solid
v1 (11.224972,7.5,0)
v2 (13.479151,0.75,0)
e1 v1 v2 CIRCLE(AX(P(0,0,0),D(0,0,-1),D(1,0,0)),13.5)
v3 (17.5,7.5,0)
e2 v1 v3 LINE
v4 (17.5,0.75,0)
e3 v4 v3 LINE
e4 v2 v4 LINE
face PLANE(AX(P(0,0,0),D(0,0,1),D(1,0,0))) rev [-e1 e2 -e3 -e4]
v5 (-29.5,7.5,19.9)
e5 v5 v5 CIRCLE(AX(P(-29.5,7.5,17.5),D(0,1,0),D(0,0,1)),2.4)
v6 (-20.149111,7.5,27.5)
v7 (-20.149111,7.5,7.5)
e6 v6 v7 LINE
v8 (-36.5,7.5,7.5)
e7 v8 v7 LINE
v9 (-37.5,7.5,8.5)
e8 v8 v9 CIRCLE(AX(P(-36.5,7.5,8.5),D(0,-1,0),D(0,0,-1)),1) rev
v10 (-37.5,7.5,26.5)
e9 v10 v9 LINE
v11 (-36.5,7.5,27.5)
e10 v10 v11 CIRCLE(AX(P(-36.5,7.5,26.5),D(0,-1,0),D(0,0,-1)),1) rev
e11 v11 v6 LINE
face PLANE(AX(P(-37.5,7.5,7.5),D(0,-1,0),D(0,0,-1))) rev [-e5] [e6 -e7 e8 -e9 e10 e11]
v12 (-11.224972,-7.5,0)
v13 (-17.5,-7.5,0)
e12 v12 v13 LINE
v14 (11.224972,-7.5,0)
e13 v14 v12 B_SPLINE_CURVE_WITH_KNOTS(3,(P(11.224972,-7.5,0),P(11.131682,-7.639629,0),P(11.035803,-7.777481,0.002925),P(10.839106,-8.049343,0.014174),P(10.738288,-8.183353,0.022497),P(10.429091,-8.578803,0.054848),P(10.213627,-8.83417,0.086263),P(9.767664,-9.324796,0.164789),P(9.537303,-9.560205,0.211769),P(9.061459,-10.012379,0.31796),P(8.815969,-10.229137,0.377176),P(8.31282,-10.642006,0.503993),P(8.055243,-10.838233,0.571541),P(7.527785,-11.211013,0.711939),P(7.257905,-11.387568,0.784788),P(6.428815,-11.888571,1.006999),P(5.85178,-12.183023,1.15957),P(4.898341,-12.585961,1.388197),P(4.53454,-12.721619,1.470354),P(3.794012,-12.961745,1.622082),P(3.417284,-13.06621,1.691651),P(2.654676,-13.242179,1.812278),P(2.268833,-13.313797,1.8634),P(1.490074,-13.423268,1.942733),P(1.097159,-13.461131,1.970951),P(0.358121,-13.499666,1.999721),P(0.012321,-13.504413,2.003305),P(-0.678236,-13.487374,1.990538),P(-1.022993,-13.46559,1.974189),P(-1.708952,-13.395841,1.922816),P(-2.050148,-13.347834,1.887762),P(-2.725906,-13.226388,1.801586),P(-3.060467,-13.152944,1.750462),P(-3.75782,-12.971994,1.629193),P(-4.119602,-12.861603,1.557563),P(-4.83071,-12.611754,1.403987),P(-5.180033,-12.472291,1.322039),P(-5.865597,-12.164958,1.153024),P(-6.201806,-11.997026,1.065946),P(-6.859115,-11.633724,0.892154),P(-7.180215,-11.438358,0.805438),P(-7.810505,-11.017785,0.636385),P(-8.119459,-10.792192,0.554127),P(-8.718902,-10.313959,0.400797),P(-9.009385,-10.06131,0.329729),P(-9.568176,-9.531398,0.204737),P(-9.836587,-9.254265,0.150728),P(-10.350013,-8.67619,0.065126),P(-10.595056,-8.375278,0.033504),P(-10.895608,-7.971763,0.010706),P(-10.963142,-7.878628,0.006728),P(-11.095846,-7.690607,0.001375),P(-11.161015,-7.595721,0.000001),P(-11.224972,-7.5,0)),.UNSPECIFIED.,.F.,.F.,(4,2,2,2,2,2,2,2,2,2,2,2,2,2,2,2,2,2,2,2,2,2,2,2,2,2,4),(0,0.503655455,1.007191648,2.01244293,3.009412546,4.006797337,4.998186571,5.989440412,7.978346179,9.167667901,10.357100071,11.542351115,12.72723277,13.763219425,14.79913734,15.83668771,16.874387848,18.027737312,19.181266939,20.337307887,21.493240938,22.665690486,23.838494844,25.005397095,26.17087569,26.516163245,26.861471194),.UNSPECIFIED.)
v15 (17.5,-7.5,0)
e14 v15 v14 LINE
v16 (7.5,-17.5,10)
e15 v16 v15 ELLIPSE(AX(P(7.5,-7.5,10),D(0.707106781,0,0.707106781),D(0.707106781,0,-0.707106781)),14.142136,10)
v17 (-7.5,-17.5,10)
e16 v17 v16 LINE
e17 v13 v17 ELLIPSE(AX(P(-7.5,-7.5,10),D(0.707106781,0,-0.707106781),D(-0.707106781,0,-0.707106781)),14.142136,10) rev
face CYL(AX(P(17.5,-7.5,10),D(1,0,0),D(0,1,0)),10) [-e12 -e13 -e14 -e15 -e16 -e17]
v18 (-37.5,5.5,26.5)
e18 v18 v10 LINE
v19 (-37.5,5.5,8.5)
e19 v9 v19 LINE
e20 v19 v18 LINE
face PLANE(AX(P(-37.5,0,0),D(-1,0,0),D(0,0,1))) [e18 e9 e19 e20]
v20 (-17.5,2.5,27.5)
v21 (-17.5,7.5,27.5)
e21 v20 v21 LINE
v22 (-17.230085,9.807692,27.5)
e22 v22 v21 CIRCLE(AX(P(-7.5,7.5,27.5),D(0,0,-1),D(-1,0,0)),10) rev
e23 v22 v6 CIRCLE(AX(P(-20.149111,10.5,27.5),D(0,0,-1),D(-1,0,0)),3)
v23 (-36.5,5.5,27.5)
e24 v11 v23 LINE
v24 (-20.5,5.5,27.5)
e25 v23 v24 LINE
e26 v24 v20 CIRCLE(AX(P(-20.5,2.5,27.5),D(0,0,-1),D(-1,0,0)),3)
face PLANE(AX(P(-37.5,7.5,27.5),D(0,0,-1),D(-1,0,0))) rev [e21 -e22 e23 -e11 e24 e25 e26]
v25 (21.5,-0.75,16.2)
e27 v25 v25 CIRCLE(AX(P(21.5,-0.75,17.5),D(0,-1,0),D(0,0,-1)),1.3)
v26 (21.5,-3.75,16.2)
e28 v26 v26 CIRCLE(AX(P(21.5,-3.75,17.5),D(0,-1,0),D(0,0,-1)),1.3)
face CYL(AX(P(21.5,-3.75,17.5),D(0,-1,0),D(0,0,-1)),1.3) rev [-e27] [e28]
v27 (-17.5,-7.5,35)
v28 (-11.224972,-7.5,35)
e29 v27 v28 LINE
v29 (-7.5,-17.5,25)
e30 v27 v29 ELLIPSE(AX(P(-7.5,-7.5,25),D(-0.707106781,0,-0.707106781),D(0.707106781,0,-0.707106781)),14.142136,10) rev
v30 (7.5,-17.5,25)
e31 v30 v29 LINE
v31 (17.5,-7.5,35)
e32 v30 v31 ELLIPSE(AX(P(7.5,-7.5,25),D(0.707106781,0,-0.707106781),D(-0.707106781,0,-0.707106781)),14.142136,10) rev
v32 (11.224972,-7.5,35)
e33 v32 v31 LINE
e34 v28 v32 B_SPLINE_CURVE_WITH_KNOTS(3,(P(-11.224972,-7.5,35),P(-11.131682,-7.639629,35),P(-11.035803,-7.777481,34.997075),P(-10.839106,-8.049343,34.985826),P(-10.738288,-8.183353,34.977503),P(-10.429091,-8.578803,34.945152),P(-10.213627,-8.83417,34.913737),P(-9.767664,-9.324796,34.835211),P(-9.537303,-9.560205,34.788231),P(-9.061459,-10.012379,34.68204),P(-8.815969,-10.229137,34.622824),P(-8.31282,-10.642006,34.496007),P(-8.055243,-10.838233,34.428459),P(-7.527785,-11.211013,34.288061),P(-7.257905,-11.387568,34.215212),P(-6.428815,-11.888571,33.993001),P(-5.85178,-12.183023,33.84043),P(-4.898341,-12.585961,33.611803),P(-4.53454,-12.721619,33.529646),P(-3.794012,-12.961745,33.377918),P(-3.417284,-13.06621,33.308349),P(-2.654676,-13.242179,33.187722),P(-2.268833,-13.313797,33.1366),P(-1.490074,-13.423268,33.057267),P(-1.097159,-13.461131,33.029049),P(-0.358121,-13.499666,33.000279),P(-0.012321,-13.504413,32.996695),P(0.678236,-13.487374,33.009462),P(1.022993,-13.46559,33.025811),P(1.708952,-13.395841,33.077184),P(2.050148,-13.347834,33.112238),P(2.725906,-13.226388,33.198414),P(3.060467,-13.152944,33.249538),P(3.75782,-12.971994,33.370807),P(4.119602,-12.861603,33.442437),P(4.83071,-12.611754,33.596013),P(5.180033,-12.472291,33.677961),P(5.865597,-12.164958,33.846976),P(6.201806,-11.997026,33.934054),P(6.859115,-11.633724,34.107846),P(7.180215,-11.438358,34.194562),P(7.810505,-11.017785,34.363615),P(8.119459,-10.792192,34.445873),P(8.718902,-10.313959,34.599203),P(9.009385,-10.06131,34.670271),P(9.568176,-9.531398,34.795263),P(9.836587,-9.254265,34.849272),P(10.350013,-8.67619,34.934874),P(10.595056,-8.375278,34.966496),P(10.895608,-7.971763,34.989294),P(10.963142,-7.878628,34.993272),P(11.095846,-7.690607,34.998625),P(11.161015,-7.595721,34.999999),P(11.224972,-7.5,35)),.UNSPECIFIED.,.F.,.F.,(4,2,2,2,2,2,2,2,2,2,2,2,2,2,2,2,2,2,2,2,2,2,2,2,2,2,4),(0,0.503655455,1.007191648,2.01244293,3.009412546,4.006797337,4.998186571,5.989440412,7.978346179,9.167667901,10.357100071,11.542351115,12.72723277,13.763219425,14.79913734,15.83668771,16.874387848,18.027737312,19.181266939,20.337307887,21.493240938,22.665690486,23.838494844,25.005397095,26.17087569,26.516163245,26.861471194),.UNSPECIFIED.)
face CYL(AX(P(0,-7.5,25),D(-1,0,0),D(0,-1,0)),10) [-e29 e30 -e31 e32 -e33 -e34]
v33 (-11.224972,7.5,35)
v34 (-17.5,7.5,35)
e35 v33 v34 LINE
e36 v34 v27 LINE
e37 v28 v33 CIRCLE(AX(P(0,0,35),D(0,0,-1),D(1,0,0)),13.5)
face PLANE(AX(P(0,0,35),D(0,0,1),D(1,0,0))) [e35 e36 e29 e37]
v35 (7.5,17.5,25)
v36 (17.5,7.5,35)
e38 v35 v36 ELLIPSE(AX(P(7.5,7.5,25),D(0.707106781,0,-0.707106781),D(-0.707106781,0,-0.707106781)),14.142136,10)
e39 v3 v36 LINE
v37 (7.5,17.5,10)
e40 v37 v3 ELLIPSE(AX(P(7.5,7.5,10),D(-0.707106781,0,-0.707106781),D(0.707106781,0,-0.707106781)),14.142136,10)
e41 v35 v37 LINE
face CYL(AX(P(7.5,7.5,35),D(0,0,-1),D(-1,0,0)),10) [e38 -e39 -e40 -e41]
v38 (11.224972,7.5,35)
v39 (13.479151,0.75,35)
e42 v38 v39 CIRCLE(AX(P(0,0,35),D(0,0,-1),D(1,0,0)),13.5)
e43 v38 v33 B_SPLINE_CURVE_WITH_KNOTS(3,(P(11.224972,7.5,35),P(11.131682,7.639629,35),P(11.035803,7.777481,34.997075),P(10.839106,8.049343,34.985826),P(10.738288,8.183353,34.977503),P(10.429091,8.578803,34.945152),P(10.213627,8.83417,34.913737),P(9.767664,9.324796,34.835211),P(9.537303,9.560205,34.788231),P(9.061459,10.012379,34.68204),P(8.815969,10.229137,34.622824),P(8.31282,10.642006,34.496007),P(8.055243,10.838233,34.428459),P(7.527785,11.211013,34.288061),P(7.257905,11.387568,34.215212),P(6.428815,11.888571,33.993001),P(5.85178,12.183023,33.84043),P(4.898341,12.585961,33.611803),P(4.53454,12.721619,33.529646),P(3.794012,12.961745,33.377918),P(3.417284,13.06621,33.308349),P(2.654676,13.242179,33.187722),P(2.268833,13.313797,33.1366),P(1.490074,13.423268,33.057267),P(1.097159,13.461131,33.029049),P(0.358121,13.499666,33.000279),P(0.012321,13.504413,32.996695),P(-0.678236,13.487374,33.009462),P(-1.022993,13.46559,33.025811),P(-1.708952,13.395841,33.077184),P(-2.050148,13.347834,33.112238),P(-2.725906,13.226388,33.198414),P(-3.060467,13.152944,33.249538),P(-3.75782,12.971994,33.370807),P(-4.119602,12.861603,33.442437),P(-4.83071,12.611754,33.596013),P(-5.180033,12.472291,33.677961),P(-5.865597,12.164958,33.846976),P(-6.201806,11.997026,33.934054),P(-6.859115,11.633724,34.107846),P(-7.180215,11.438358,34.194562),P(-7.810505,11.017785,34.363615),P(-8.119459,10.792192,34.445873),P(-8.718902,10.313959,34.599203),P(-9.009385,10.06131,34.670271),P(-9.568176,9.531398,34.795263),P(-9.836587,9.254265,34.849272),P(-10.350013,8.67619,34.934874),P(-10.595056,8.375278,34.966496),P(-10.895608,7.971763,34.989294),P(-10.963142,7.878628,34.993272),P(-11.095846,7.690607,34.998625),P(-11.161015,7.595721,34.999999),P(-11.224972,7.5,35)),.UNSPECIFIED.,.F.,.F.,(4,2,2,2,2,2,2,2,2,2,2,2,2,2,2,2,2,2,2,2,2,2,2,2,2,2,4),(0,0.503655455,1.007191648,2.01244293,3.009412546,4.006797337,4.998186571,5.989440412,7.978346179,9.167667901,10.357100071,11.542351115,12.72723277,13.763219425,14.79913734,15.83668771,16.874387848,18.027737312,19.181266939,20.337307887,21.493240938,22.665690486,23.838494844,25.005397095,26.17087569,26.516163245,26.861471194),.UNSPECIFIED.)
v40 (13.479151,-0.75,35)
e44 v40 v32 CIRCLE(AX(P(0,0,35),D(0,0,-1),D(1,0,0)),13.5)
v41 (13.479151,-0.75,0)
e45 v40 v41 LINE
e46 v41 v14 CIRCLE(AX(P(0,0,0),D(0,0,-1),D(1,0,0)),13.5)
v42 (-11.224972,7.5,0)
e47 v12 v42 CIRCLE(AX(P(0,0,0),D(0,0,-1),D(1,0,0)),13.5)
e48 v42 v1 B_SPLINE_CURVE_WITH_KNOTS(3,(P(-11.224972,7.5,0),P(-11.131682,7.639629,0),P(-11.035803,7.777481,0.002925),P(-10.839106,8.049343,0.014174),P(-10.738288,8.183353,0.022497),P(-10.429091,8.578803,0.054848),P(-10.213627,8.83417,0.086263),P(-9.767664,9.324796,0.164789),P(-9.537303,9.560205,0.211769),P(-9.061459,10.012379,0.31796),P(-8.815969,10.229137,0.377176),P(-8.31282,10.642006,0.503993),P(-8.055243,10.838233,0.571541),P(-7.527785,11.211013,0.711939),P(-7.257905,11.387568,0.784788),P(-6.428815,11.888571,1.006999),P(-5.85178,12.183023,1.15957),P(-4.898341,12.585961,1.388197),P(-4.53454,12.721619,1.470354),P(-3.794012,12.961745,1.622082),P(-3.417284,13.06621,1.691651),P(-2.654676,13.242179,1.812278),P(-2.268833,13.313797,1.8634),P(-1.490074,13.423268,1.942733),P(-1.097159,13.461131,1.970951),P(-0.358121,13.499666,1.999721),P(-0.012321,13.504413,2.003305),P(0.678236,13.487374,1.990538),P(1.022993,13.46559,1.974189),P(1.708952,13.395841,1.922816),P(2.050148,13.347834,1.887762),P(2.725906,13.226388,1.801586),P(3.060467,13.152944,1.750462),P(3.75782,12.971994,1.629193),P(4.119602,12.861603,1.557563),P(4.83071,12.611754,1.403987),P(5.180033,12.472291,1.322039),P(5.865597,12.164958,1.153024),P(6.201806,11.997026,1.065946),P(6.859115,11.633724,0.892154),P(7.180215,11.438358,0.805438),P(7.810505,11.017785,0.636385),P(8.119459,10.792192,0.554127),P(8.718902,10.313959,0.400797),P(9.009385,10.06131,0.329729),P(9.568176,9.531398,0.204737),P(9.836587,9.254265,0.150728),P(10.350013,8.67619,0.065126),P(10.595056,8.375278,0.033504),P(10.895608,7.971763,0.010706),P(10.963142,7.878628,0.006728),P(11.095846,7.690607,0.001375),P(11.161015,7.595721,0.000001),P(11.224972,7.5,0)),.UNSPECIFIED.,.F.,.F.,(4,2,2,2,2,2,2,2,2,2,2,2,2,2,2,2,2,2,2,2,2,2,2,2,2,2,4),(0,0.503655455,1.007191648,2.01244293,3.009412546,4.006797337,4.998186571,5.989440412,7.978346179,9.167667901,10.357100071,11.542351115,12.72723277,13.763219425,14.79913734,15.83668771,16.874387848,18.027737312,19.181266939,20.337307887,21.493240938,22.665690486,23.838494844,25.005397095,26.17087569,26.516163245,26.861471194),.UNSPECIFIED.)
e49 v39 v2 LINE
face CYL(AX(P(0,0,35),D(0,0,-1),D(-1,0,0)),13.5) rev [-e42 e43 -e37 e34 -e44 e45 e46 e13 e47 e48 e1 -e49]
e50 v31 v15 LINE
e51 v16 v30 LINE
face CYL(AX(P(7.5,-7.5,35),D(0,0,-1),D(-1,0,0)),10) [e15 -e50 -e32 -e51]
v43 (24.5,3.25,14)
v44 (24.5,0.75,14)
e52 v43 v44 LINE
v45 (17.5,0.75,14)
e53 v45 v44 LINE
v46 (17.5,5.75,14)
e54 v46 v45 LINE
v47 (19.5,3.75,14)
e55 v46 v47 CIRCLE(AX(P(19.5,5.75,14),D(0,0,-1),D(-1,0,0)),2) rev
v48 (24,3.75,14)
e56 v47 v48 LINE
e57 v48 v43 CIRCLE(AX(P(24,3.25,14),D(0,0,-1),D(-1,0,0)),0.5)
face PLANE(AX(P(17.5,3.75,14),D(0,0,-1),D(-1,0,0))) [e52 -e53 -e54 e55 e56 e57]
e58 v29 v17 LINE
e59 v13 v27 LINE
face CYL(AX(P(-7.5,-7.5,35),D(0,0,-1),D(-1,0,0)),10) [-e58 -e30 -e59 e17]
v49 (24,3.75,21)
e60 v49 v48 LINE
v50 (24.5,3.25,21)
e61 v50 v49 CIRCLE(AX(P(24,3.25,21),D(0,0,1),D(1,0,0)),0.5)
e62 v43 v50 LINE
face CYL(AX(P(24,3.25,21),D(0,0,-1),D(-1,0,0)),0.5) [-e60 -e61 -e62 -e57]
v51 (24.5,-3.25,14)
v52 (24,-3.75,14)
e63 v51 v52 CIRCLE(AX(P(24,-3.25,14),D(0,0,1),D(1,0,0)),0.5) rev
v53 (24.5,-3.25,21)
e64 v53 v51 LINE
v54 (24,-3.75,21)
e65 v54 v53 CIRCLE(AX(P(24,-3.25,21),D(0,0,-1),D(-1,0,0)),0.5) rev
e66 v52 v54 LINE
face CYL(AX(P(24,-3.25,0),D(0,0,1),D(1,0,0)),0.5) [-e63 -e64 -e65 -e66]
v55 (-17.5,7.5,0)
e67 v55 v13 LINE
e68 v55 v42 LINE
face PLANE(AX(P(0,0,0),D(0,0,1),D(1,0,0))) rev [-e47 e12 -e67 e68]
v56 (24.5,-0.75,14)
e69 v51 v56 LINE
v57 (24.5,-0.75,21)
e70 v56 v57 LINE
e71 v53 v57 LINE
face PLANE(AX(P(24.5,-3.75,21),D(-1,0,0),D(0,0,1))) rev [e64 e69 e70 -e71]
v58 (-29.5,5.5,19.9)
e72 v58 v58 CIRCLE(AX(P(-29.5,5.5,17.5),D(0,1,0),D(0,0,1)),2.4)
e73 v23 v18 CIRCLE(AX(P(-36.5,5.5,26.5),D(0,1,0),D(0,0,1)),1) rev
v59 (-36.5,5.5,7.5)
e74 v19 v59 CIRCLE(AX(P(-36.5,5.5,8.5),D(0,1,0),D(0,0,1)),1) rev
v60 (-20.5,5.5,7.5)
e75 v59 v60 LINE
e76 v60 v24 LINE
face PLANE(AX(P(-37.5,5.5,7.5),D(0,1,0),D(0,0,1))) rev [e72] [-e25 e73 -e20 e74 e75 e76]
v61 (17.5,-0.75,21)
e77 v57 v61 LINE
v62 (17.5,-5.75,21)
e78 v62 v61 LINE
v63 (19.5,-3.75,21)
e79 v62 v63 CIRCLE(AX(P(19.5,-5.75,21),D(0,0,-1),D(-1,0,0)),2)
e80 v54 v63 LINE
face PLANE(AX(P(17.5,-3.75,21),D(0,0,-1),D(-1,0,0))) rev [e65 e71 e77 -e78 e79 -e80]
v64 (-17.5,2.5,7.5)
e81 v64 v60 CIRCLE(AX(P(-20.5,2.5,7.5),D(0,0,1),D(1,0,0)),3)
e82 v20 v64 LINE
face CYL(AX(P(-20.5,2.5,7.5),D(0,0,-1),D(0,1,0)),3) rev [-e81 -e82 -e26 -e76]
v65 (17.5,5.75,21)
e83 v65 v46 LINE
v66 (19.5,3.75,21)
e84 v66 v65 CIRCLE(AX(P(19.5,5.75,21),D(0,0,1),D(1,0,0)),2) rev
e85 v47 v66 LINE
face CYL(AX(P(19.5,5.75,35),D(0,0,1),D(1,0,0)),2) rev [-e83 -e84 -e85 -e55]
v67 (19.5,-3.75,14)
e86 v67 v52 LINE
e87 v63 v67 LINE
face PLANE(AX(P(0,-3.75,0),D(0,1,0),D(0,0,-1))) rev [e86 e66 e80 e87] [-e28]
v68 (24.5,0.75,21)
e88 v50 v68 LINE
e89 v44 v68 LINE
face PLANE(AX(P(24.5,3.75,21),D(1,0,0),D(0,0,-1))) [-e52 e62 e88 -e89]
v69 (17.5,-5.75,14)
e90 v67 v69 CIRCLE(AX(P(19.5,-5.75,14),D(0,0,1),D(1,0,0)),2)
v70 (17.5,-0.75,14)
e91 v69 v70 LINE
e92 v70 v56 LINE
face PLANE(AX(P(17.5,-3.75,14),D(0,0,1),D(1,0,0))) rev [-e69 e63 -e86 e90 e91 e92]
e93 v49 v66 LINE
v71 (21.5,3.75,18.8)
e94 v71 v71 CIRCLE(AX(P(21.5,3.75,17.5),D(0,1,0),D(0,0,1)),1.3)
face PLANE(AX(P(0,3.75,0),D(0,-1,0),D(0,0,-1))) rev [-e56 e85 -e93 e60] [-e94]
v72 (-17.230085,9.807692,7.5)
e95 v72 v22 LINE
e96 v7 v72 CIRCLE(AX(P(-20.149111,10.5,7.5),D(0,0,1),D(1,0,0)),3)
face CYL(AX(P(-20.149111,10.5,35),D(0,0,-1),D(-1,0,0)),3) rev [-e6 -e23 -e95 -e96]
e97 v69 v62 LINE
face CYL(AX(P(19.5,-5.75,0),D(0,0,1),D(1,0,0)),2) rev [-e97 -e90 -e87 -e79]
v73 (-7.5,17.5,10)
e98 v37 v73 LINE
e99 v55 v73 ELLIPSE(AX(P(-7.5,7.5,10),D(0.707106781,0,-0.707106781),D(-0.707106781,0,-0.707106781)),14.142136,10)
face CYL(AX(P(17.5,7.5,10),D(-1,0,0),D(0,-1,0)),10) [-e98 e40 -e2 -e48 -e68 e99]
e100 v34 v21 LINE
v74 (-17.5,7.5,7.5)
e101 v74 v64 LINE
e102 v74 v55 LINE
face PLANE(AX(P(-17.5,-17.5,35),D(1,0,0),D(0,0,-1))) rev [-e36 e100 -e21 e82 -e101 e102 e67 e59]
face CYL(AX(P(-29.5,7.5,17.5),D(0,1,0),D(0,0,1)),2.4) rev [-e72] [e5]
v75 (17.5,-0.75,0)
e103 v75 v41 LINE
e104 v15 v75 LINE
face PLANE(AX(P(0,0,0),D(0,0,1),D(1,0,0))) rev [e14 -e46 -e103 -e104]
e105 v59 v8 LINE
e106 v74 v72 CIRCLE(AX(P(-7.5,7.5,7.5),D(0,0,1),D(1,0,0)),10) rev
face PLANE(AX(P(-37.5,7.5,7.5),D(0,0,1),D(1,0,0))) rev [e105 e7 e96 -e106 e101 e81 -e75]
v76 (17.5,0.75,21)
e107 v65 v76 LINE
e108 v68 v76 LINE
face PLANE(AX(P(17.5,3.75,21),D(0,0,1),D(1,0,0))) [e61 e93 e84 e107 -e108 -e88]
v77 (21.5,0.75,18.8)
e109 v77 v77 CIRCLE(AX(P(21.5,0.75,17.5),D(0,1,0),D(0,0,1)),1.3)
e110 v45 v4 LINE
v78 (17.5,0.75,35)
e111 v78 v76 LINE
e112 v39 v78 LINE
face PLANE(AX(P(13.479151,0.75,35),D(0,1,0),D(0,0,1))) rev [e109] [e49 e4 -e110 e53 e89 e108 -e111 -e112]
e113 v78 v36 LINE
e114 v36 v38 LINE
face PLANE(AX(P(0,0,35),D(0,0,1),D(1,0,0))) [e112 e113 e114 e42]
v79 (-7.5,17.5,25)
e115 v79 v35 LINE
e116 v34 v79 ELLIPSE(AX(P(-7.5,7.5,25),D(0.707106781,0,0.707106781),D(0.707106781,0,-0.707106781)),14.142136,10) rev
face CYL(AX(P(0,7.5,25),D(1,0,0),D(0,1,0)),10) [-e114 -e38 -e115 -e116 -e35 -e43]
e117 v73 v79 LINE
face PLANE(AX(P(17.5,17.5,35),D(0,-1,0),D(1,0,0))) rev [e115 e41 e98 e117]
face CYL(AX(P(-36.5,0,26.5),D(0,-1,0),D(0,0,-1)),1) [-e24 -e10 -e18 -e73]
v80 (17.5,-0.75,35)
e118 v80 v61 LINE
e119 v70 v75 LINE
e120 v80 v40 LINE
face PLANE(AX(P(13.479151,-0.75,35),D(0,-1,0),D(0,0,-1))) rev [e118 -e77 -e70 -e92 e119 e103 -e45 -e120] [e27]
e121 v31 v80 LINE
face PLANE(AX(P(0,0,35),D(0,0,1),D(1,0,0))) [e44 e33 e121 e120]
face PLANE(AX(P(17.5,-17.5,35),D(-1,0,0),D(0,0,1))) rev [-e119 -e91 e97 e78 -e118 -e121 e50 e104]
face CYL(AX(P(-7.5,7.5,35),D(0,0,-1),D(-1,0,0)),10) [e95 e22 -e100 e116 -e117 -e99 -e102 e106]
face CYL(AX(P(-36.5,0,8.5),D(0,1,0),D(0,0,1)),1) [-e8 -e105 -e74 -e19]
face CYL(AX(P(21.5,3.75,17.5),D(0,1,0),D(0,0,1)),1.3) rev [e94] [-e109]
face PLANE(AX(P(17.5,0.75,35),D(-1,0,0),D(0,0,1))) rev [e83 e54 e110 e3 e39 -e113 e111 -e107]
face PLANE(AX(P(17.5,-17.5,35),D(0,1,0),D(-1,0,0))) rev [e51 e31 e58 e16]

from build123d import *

# Parameters (mm, degrees)
BOSS_EXTRUDE1_DEPTH  = 35
SKETCH3_W            = 7
SKETCH3_H            = 7
BOSS_EXTRUDE2_DEPTH  = 3
FILLET1_R            = 2
FILLET2_R            = 0.5
M2_CLEARANCE_HOLE1_D = 2.6
FILLET3_R            = 0.5
FILLET4_R            = 2
FILLET5_R            = 10
SKETCH8_W            = 20
SKETCH8_H            = 2
BOSS_EXTRUDE4_DEPTH  = 20
M4_CLEARANCE_HOLE1_D = 4.8
FILLET6_R            = 3
FILLET7_R            = 1


with BuildPart() as part:
    # Sketch1 → Boss-Extrude1 (new body)
    with BuildSketch(Plane.XY):
        with BuildLine():
            Line((13.479150567, 0.75), (17.5, 0.75))
            Line((17.5, 0.75), (17.5, 17.5))
            Line((17.5, 17.5), (-17.5, 17.5))
            Line((-17.5, 17.5), (-17.5, -17.5))
            Line((-17.5, -17.5), (17.5, -17.5))
            Line((17.5, -17.5), (17.5, -0.75))
            Line((17.5, -0.75), (13.479150567, -0.75))
            ThreePointArc((13.479150567, -0.75), (-13.5, 0), (13.479150567, 0.75))
        make_face()
    extrude(amount=BOSS_EXTRUDE1_DEPTH)

    # Sketch3 → Boss-Extrude2 (add)
    with BuildSketch(Plane.XZ.offset(-0.75)):
        with Locations((21, 17.5)):
            Rectangle(SKETCH3_W, SKETCH3_H)
    boss_extrude2 = extrude(amount=-BOSS_EXTRUDE2_DEPTH)

    # Fillet1
    fillet1_edges = [part.edges().sort_by_distance(p)[0] for p in [
        (17.5, 3.75, 17.5),
    ]]
    fillet(fillet1_edges, radius=FILLET1_R)

    # Fillet2
    fillet2_edges = [part.edges().sort_by_distance(p)[0] for p in [
        (24.5, 3.75, 17.5),
    ]]
    fillet(fillet2_edges, radius=FILLET2_R)

    # M2 Clearance Hole1 (through all)
    with Locations(Plane(origin=(0, 3.75, 0), x_dir=(1, 0, 0), z_dir=(0, 1, 0))):
        with Locations((21.5, -17.5)):
            m2_clearance_hole1 = Hole(M2_CLEARANCE_HOLE1_D / 2)

    # Mirror3: Boss-Extrude2 across plane
    add(boss_extrude2.mirror(Plane.ZX))

    # Mirror5: M2 Clearance Hole1 across plane
    add(m2_clearance_hole1.mirror(Plane.ZX), mode=Mode.SUBTRACT)

    # Fillet3
    fillet3_edges = [part.edges().sort_by_distance(p)[0] for p in [
        (24.5, -3.75, 17.5),
    ]]
    fillet(fillet3_edges, radius=FILLET3_R)

    # Fillet4
    fillet4_edges = [part.edges().sort_by_distance(p)[0] for p in [
        (17.5, -3.75, 17.5),
    ]]
    fillet(fillet4_edges, radius=FILLET4_R)

    # Fillet5
    # the kernel refuses this fillet: 10 mm, written as the material it takes off along each edge
    with BuildSketch(Plane(origin=(-42.5, -17.5, 0), x_dir=(0, 0, 1), z_dir=(1, 0, 0)), Plane(origin=(17.5, -17.5, -25), x_dir=(-1, 0, 0), z_dir=(0, 0, 1)), Plane(origin=(42.5, 17.5, 35), x_dir=(0, -1, 0), z_dir=(-1, 0, 0)), Plane(origin=(42.5, 17.5, 0), x_dir=(0, 0, 1), z_dir=(-1, 0, 0)), Plane(origin=(-42.5, -17.5, 35), x_dir=(0, 1, 0), z_dir=(1, 0, 0))) as fillet5_piece_1:
        with BuildLine():
            CenterArc((FILLET5_R, -FILLET5_R), FILLET5_R, 90, 90)
            Line((0, -FILLET5_R), (0, 0))
            Line((0, 0), (FILLET5_R, 0))
        make_face()
    extrude(amount=85, mode=Mode.SUBTRACT)
    with BuildSketch(Plane(origin=(-17.5, 17.5, -25), x_dir=(0, -1, 0), z_dir=(0, 0, 1)), Plane(origin=(17.5, 17.5, -25), x_dir=(-1, 0, 0), z_dir=(0, 0, 1)), Plane(origin=(-17.5, -17.5, -25), x_dir=(1, 0, 0), z_dir=(0, 0, 1))) as fillet5_piece_2:
        with BuildLine():
            CenterArc((FILLET5_R, FILLET5_R), FILLET5_R, 180, 90)
            Line((0, FILLET5_R), (0, 0))
            Line((0, 0), (FILLET5_R, 0))
        make_face()
    extrude(amount=85, mode=Mode.SUBTRACT)

    # Sketch8 → Boss-Extrude4 (add)
    with BuildSketch(Plane.ZY.offset(17.5)):
        with Locations((17.5, 6.5)):
            Rectangle(SKETCH8_W, SKETCH8_H)
    extrude(amount=BOSS_EXTRUDE4_DEPTH)

    # M4 Clearance Hole1 (through all)
    with Locations(Plane(origin=(0, 7.5, 0), x_dir=(1, 0, 0), z_dir=(0, 1, 0))):
        with Locations((-29.5, -17.5)):
            Hole(M4_CLEARANCE_HOLE1_D / 2)

    # Fillet6
    fillet6_edges = [part.edges().sort_by_distance(p)[0] for p in [
        (-17.5, 5.5, 17.5),
        (-17.5, 7.5, 17.5),
    ]]
    fillet(fillet6_edges, radius=FILLET6_R)

    # Fillet7
    fillet7_edges = [part.edges().sort_by_distance(p)[0] for p in [
        (-37.5, 6.5, 7.5),
        (-37.5, 6.5, 27.5),
    ]]
    fillet(fillet7_edges, radius=FILLET7_R)


solid = part.part
